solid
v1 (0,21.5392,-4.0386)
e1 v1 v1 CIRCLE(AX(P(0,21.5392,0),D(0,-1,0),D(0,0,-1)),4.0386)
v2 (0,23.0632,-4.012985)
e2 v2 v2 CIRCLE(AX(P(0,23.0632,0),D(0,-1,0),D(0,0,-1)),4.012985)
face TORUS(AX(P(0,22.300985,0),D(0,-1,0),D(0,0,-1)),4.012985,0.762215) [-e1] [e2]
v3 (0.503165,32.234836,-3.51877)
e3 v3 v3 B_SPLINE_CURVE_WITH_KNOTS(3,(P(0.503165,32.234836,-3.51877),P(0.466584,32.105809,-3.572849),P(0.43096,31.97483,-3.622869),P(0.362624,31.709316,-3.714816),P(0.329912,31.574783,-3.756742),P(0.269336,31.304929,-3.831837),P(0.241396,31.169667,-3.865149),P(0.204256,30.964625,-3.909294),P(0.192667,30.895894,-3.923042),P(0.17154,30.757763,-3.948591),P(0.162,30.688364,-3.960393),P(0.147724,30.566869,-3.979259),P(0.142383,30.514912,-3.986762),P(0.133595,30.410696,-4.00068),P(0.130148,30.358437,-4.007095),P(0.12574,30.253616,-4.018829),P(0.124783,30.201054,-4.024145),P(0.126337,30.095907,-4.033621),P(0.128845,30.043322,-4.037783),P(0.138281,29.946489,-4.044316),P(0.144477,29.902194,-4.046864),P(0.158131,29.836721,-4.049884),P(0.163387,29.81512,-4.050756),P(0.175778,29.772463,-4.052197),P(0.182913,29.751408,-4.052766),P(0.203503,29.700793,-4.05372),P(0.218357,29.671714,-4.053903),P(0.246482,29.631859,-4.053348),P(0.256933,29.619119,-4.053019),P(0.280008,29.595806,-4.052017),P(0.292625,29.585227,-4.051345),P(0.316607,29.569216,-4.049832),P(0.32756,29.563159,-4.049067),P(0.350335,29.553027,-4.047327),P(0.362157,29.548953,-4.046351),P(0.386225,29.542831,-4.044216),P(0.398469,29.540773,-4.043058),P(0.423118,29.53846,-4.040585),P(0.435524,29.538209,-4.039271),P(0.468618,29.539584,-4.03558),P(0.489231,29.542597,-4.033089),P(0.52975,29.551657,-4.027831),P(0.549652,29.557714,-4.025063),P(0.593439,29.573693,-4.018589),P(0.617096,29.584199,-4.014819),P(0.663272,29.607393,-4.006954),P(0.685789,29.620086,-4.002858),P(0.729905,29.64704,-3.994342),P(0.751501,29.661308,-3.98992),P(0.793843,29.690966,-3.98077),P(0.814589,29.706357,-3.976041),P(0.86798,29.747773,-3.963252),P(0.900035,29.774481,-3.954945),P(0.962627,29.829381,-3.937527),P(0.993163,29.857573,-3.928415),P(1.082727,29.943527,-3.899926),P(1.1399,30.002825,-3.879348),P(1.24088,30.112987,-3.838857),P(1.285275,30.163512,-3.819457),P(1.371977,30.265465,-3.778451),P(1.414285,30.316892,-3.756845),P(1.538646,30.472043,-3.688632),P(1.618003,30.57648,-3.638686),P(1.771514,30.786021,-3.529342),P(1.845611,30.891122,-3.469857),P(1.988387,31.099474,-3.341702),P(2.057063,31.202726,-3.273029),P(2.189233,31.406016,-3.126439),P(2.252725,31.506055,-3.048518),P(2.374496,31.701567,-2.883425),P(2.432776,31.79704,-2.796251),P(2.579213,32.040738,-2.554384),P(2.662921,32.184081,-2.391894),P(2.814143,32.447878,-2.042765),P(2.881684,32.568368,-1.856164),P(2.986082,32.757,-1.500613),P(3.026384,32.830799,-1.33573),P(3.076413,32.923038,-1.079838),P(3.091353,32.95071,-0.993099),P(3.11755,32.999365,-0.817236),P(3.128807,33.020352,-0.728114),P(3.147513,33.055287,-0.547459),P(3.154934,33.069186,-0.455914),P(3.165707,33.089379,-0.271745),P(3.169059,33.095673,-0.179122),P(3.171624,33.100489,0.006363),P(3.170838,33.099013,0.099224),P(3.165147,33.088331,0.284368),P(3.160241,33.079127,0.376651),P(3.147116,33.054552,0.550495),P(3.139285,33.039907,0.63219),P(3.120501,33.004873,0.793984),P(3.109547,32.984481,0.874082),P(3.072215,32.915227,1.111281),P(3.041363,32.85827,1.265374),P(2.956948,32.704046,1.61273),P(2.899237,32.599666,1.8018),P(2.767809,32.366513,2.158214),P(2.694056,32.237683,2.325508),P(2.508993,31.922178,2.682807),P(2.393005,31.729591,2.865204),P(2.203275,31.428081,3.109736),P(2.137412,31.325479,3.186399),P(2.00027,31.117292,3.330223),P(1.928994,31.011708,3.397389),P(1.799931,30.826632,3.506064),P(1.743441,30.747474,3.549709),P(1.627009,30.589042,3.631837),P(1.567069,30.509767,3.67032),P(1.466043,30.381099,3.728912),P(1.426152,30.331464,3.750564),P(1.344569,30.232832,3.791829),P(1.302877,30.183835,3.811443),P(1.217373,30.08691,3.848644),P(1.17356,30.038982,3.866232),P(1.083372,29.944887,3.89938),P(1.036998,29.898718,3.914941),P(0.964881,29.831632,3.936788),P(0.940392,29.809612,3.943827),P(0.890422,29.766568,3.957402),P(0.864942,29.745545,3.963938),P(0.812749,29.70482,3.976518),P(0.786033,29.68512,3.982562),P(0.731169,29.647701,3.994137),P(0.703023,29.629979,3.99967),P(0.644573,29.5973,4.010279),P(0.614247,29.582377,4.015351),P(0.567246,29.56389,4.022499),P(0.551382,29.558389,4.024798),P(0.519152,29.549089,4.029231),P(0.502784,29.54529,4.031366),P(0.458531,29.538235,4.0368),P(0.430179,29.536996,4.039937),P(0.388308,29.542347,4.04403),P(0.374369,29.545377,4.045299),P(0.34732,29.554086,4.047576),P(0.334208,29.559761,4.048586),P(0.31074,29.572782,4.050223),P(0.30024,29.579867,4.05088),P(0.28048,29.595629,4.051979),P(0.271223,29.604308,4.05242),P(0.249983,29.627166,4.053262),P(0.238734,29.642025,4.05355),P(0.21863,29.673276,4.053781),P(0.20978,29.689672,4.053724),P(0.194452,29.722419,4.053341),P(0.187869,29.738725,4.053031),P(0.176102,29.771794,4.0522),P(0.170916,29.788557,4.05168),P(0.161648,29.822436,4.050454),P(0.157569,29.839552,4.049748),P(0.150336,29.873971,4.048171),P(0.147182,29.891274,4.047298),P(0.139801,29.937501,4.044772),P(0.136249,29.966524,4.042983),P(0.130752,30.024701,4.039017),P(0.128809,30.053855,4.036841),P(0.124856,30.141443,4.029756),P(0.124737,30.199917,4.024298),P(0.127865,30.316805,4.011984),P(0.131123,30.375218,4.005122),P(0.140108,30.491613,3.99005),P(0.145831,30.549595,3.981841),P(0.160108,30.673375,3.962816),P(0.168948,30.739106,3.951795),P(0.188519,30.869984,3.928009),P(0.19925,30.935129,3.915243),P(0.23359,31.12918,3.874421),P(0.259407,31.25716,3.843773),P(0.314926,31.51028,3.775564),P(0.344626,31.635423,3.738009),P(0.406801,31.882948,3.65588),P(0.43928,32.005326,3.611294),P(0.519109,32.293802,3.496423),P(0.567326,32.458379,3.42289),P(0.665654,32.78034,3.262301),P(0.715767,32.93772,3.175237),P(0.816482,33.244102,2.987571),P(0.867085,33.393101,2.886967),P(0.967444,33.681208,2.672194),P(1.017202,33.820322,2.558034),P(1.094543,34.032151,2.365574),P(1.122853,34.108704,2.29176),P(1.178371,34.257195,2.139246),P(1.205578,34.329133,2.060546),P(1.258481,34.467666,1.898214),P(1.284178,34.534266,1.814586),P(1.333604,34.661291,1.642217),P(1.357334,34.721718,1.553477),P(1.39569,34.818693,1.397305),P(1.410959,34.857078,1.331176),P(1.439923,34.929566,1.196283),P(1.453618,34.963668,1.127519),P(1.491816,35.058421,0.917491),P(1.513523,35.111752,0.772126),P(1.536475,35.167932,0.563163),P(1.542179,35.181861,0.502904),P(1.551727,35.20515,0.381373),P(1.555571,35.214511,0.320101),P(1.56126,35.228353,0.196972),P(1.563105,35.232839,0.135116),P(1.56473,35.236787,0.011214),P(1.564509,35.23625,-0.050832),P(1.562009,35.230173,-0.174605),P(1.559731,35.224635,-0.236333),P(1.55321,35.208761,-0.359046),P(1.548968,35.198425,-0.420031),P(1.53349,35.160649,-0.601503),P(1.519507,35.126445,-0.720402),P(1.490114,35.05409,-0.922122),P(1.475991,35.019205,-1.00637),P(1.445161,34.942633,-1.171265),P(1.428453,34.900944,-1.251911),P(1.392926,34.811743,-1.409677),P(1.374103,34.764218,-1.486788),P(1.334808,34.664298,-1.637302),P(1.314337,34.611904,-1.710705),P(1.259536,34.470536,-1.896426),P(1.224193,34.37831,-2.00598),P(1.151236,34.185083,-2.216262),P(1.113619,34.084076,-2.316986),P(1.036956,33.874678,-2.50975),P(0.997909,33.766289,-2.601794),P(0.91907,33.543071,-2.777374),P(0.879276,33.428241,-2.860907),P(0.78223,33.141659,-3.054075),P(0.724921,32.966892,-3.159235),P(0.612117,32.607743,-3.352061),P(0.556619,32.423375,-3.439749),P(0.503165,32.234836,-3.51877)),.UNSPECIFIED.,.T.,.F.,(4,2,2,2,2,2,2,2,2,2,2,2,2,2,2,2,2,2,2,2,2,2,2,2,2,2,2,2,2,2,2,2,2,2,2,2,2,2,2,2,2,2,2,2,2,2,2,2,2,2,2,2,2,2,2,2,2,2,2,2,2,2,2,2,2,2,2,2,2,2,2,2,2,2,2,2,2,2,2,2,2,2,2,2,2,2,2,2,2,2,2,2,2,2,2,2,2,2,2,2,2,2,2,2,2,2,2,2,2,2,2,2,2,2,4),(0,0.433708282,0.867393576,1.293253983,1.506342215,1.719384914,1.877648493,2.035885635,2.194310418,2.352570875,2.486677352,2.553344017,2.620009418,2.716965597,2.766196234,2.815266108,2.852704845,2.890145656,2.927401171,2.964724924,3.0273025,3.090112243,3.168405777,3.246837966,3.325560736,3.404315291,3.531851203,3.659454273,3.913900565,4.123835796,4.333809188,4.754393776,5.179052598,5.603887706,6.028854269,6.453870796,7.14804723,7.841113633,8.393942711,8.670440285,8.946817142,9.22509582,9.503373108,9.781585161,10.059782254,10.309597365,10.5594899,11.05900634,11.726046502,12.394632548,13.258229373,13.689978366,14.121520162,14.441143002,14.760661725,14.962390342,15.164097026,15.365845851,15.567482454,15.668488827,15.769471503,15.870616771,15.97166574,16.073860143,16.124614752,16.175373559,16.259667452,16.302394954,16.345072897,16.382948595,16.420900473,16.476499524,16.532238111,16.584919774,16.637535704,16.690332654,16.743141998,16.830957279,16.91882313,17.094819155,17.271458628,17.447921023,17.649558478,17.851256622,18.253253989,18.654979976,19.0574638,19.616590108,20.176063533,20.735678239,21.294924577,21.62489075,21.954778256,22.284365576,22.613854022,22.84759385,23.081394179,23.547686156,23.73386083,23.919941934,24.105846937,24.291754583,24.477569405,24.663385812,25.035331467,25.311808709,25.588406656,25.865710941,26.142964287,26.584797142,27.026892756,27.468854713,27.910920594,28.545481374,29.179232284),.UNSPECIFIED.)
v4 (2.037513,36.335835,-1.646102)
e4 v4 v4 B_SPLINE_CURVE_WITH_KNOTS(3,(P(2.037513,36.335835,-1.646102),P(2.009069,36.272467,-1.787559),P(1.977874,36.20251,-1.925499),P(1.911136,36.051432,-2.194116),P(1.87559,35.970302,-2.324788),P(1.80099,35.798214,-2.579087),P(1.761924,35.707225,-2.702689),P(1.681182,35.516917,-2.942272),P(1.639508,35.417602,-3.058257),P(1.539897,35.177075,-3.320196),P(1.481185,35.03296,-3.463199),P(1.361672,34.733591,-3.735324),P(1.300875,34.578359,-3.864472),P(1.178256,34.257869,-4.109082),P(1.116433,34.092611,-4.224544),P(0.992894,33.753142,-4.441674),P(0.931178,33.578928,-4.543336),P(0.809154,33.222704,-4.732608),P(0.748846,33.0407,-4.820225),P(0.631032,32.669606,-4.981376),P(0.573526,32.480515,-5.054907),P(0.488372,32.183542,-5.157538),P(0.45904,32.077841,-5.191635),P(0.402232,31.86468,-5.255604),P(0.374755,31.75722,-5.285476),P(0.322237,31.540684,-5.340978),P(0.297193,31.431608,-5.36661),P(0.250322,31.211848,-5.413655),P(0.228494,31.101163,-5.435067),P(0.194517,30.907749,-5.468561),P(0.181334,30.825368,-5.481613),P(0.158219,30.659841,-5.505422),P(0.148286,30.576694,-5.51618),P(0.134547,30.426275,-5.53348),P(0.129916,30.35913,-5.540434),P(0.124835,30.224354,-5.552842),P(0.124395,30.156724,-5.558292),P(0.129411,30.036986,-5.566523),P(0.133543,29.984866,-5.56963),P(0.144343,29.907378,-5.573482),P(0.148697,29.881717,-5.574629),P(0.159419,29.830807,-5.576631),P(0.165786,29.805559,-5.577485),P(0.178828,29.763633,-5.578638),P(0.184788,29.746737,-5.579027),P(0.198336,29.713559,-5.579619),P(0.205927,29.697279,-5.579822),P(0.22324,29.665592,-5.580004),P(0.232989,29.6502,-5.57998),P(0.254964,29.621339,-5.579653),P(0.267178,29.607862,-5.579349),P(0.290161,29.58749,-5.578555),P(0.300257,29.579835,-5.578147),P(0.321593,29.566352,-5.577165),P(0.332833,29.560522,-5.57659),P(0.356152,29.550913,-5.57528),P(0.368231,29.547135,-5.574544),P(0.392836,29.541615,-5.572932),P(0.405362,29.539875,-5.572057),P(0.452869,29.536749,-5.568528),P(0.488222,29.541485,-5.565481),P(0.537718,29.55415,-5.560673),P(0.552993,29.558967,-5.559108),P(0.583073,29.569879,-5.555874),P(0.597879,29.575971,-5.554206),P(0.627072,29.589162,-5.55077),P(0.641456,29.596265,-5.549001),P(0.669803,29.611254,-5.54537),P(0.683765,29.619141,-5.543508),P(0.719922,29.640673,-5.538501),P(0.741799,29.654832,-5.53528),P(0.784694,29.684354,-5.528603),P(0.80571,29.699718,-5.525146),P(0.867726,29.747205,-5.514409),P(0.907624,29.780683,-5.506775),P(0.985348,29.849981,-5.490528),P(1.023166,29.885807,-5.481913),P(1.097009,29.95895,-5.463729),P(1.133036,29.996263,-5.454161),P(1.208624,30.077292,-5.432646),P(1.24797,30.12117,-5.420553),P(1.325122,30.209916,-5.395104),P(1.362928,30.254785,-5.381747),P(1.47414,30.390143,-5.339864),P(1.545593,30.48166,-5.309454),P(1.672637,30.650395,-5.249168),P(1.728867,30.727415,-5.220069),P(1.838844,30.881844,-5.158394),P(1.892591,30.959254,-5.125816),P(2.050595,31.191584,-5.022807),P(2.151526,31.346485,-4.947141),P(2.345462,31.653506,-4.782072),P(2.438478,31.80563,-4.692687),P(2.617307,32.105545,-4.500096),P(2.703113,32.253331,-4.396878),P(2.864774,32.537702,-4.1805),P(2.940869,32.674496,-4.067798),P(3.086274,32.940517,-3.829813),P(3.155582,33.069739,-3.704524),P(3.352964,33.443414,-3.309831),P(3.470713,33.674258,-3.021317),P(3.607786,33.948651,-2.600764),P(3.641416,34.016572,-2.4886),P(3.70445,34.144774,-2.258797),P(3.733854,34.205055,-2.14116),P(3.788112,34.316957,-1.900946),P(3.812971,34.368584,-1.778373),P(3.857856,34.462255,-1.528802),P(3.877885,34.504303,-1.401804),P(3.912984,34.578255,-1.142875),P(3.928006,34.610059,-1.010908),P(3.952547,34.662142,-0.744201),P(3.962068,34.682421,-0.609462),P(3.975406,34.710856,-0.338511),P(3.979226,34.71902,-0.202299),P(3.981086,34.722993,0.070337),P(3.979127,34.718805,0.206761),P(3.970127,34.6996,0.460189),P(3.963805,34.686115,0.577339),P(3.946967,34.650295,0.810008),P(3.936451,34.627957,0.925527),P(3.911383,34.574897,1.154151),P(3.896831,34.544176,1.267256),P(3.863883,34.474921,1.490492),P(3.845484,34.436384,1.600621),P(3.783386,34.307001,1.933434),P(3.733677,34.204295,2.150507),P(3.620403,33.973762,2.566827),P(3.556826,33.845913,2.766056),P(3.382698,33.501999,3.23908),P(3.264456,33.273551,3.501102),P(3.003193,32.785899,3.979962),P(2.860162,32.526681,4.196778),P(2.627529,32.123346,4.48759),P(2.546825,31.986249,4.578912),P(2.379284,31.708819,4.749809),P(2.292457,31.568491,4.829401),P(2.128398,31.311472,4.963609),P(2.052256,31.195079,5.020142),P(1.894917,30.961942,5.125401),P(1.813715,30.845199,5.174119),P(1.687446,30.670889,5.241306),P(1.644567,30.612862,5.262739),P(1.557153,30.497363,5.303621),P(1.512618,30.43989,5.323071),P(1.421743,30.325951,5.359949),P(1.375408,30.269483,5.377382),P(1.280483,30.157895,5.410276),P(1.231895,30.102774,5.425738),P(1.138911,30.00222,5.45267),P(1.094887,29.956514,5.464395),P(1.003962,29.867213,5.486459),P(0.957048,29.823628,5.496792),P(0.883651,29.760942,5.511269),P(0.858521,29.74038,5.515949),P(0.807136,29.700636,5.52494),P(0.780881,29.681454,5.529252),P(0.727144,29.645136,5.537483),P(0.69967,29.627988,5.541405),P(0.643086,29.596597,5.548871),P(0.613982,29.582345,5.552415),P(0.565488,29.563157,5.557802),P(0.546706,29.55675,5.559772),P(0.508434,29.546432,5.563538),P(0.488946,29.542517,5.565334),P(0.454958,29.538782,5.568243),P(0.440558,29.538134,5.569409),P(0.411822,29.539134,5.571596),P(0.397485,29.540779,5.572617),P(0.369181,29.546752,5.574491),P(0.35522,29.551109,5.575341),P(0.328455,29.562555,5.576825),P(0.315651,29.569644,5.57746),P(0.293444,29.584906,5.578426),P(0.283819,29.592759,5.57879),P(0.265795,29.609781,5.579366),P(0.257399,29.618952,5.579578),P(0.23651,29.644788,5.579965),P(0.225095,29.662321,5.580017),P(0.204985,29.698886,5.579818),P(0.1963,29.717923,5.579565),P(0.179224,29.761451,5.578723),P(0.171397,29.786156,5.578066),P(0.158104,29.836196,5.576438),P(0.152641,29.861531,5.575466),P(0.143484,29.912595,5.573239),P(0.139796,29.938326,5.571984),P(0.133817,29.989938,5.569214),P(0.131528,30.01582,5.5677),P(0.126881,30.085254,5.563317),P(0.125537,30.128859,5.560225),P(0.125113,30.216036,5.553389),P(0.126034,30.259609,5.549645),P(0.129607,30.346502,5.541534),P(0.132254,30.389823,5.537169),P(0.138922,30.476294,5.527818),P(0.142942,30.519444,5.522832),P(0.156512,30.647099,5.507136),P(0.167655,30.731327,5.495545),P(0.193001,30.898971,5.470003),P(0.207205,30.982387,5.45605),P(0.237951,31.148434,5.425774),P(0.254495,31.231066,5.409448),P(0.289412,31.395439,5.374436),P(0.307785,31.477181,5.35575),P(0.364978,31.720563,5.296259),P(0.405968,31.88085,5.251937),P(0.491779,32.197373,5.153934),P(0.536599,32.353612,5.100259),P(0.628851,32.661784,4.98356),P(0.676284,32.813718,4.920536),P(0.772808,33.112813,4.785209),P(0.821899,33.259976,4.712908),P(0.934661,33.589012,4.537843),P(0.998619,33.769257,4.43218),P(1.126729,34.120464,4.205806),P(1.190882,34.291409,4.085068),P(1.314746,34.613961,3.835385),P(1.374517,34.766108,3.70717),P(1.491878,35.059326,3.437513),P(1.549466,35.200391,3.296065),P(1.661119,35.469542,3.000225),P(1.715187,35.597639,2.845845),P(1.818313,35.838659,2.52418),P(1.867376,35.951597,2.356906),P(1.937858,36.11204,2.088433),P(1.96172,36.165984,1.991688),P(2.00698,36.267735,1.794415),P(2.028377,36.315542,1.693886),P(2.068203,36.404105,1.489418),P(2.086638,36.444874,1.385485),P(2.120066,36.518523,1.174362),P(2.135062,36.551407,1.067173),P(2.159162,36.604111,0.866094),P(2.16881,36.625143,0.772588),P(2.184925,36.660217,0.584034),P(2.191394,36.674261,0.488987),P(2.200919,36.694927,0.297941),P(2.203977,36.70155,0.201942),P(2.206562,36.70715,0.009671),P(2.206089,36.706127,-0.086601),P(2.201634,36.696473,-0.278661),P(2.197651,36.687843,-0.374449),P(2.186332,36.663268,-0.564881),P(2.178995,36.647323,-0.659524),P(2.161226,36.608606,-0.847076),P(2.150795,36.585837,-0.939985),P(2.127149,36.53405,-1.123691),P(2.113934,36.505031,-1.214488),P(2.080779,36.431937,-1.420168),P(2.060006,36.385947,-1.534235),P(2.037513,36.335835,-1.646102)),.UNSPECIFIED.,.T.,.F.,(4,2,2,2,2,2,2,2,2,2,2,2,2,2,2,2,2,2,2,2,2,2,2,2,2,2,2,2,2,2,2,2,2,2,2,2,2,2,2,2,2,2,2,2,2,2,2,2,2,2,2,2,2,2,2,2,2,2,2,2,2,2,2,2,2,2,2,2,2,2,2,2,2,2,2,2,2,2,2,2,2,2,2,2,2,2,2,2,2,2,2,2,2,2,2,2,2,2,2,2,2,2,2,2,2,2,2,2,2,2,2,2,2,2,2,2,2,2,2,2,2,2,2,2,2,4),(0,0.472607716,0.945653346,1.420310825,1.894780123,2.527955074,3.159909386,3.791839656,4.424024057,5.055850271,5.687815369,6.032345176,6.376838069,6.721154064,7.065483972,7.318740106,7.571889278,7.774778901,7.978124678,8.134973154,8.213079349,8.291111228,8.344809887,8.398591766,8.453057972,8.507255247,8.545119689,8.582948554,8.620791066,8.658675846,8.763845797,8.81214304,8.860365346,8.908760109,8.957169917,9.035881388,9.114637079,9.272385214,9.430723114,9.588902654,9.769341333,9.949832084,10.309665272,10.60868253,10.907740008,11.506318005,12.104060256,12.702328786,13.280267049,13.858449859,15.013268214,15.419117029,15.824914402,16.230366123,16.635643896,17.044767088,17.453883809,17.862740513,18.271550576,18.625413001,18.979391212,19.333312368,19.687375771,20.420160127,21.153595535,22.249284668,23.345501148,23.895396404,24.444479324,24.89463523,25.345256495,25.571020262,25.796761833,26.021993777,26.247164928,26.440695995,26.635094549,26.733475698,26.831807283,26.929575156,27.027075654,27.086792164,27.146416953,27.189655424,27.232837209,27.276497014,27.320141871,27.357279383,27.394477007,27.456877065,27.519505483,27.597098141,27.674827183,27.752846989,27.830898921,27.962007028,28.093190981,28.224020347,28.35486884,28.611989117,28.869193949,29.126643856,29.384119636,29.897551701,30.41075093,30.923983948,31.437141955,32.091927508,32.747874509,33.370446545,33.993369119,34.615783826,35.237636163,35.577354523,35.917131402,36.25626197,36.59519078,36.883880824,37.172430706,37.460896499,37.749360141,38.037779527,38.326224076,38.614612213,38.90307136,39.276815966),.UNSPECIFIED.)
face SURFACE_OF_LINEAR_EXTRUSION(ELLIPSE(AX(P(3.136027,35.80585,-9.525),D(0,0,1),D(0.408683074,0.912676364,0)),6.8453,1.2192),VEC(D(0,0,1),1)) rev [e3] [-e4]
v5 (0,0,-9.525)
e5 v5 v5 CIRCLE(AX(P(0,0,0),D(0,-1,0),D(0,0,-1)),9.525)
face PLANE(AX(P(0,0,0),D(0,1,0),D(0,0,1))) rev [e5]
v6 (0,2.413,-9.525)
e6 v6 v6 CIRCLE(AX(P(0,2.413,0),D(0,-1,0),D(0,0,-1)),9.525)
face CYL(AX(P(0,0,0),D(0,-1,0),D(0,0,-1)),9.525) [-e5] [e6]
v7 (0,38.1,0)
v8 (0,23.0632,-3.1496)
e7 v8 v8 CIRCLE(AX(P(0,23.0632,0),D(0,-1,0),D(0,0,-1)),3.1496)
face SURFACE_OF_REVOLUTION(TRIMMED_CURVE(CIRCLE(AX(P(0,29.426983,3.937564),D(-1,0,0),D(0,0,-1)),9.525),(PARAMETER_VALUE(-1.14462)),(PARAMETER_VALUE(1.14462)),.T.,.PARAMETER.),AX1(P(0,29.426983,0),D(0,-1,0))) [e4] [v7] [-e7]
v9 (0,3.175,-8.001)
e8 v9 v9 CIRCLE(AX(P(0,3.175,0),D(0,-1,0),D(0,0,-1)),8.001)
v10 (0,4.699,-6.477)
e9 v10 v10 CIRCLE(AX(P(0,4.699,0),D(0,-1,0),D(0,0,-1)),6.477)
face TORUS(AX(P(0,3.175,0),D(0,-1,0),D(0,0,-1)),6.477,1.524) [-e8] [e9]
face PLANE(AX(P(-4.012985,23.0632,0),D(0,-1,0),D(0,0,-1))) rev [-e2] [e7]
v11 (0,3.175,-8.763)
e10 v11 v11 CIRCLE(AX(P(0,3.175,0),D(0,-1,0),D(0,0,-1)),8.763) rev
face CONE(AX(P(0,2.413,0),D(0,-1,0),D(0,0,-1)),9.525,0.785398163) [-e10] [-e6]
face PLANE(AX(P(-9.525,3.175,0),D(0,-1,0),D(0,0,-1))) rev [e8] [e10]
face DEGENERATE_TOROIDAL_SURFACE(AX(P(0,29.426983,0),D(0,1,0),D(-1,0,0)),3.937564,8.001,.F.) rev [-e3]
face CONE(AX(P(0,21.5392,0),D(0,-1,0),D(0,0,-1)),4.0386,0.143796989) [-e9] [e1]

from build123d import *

# Parameters (mm, degrees)
FILLET1_R               = 1.524
CHAMFER1_SIZE           = 0.762
CUT_EXTRUDE1_DEPTH      = 41.411152639
CUT_EXTRUDE1_DEPTH_BACK = 41.411152639
SKETCH3_RX              = 6.8453
SKETCH3_RY              = 1.2192


with BuildPart() as part:
    # Sketch2 → Revolve1 (revolve)
    with BuildSketch(Plane.XY, mode=Mode.PRIVATE) as revolve1_sk:
        with BuildLine():
            Line((0, 0), (-9.525, 0))
            Line((-9.525, 0), (-9.525, 3.175))
            Line((-9.525, 3.175), (-8.001, 3.175))
            Line((-8.001, 3.175), (-8.001, 4.699))
            Line((-8.001, 4.699), (-6.477, 4.699))
            Line((-6.477, 4.699), (-4.0386, 21.5392))
            ThreePointArc((-4.0386, 21.5392), (-4.775092358, 22.313794174), (-4.01298473, 23.0632))
            Line((-4.01298473, 23.0632), (-3.1496, 23.0632))
            ThreePointArc((-3.1496, 23.0632), (-5.385123327, 31.379708264), (0, 38.1))
            Line((0, 38.1), (0, 0))
        make_face()
    revolve(revolve1_sk.sketch.rotate(Axis((0, 0, 0), (0, 1, 0)), 270), axis=Axis((0, 0, 0), (0, 1, 0)))

    # Fillet1
    fillet1_edges = [part.edges().sort_by_distance(p)[0] for p in [
        (0, 4.699, 8.001),
    ]]
    fillet(fillet1_edges, radius=FILLET1_R - 0.0001)  # a hair under: the kernel refuses the full size

    # Chamfer1
    chamfer1_edges = [part.edges().sort_by_distance(p)[0] for p in [
        (0, 3.175, 9.525),
    ]]
    chamfer(chamfer1_edges, length=CHAMFER1_SIZE)

    # Sketch3 → Cut-Extrude1 (cut, two sides: drawn at the far end of the back side and taken through both)
    with BuildSketch(Plane.XY.offset(-CUT_EXTRUDE1_DEPTH_BACK)):
        with Locations(Location((3.136027313, 35.805849793), (0, 0, 65.87786559))):
            Ellipse(SKETCH3_RX, SKETCH3_RY)
    extrude(amount=CUT_EXTRUDE1_DEPTH + CUT_EXTRUDE1_DEPTH_BACK, mode=Mode.SUBTRACT)

    # Sketch4 → Revolve2 (revolve)
    with BuildSketch(Plane.XY, mode=Mode.PRIVATE) as revolve2_sk:
        with BuildLine():
            Line((0, 36.392009835), (0, 24.08140533))
            Line((0, 24.08140533), (-2.015653835, 24.08140533))
            ThreePointArc((-2.015653835, 24.08140533), (-3.958298201, 30.719797487), (0, 36.392009835))
        make_face()
    revolve(revolve2_sk.sketch.rotate(Axis((0, 38.1, 0), (0, -1, 0)), 90), axis=Axis((0, 38.1, 0), (0, -1, 0)))


solid = part.part
